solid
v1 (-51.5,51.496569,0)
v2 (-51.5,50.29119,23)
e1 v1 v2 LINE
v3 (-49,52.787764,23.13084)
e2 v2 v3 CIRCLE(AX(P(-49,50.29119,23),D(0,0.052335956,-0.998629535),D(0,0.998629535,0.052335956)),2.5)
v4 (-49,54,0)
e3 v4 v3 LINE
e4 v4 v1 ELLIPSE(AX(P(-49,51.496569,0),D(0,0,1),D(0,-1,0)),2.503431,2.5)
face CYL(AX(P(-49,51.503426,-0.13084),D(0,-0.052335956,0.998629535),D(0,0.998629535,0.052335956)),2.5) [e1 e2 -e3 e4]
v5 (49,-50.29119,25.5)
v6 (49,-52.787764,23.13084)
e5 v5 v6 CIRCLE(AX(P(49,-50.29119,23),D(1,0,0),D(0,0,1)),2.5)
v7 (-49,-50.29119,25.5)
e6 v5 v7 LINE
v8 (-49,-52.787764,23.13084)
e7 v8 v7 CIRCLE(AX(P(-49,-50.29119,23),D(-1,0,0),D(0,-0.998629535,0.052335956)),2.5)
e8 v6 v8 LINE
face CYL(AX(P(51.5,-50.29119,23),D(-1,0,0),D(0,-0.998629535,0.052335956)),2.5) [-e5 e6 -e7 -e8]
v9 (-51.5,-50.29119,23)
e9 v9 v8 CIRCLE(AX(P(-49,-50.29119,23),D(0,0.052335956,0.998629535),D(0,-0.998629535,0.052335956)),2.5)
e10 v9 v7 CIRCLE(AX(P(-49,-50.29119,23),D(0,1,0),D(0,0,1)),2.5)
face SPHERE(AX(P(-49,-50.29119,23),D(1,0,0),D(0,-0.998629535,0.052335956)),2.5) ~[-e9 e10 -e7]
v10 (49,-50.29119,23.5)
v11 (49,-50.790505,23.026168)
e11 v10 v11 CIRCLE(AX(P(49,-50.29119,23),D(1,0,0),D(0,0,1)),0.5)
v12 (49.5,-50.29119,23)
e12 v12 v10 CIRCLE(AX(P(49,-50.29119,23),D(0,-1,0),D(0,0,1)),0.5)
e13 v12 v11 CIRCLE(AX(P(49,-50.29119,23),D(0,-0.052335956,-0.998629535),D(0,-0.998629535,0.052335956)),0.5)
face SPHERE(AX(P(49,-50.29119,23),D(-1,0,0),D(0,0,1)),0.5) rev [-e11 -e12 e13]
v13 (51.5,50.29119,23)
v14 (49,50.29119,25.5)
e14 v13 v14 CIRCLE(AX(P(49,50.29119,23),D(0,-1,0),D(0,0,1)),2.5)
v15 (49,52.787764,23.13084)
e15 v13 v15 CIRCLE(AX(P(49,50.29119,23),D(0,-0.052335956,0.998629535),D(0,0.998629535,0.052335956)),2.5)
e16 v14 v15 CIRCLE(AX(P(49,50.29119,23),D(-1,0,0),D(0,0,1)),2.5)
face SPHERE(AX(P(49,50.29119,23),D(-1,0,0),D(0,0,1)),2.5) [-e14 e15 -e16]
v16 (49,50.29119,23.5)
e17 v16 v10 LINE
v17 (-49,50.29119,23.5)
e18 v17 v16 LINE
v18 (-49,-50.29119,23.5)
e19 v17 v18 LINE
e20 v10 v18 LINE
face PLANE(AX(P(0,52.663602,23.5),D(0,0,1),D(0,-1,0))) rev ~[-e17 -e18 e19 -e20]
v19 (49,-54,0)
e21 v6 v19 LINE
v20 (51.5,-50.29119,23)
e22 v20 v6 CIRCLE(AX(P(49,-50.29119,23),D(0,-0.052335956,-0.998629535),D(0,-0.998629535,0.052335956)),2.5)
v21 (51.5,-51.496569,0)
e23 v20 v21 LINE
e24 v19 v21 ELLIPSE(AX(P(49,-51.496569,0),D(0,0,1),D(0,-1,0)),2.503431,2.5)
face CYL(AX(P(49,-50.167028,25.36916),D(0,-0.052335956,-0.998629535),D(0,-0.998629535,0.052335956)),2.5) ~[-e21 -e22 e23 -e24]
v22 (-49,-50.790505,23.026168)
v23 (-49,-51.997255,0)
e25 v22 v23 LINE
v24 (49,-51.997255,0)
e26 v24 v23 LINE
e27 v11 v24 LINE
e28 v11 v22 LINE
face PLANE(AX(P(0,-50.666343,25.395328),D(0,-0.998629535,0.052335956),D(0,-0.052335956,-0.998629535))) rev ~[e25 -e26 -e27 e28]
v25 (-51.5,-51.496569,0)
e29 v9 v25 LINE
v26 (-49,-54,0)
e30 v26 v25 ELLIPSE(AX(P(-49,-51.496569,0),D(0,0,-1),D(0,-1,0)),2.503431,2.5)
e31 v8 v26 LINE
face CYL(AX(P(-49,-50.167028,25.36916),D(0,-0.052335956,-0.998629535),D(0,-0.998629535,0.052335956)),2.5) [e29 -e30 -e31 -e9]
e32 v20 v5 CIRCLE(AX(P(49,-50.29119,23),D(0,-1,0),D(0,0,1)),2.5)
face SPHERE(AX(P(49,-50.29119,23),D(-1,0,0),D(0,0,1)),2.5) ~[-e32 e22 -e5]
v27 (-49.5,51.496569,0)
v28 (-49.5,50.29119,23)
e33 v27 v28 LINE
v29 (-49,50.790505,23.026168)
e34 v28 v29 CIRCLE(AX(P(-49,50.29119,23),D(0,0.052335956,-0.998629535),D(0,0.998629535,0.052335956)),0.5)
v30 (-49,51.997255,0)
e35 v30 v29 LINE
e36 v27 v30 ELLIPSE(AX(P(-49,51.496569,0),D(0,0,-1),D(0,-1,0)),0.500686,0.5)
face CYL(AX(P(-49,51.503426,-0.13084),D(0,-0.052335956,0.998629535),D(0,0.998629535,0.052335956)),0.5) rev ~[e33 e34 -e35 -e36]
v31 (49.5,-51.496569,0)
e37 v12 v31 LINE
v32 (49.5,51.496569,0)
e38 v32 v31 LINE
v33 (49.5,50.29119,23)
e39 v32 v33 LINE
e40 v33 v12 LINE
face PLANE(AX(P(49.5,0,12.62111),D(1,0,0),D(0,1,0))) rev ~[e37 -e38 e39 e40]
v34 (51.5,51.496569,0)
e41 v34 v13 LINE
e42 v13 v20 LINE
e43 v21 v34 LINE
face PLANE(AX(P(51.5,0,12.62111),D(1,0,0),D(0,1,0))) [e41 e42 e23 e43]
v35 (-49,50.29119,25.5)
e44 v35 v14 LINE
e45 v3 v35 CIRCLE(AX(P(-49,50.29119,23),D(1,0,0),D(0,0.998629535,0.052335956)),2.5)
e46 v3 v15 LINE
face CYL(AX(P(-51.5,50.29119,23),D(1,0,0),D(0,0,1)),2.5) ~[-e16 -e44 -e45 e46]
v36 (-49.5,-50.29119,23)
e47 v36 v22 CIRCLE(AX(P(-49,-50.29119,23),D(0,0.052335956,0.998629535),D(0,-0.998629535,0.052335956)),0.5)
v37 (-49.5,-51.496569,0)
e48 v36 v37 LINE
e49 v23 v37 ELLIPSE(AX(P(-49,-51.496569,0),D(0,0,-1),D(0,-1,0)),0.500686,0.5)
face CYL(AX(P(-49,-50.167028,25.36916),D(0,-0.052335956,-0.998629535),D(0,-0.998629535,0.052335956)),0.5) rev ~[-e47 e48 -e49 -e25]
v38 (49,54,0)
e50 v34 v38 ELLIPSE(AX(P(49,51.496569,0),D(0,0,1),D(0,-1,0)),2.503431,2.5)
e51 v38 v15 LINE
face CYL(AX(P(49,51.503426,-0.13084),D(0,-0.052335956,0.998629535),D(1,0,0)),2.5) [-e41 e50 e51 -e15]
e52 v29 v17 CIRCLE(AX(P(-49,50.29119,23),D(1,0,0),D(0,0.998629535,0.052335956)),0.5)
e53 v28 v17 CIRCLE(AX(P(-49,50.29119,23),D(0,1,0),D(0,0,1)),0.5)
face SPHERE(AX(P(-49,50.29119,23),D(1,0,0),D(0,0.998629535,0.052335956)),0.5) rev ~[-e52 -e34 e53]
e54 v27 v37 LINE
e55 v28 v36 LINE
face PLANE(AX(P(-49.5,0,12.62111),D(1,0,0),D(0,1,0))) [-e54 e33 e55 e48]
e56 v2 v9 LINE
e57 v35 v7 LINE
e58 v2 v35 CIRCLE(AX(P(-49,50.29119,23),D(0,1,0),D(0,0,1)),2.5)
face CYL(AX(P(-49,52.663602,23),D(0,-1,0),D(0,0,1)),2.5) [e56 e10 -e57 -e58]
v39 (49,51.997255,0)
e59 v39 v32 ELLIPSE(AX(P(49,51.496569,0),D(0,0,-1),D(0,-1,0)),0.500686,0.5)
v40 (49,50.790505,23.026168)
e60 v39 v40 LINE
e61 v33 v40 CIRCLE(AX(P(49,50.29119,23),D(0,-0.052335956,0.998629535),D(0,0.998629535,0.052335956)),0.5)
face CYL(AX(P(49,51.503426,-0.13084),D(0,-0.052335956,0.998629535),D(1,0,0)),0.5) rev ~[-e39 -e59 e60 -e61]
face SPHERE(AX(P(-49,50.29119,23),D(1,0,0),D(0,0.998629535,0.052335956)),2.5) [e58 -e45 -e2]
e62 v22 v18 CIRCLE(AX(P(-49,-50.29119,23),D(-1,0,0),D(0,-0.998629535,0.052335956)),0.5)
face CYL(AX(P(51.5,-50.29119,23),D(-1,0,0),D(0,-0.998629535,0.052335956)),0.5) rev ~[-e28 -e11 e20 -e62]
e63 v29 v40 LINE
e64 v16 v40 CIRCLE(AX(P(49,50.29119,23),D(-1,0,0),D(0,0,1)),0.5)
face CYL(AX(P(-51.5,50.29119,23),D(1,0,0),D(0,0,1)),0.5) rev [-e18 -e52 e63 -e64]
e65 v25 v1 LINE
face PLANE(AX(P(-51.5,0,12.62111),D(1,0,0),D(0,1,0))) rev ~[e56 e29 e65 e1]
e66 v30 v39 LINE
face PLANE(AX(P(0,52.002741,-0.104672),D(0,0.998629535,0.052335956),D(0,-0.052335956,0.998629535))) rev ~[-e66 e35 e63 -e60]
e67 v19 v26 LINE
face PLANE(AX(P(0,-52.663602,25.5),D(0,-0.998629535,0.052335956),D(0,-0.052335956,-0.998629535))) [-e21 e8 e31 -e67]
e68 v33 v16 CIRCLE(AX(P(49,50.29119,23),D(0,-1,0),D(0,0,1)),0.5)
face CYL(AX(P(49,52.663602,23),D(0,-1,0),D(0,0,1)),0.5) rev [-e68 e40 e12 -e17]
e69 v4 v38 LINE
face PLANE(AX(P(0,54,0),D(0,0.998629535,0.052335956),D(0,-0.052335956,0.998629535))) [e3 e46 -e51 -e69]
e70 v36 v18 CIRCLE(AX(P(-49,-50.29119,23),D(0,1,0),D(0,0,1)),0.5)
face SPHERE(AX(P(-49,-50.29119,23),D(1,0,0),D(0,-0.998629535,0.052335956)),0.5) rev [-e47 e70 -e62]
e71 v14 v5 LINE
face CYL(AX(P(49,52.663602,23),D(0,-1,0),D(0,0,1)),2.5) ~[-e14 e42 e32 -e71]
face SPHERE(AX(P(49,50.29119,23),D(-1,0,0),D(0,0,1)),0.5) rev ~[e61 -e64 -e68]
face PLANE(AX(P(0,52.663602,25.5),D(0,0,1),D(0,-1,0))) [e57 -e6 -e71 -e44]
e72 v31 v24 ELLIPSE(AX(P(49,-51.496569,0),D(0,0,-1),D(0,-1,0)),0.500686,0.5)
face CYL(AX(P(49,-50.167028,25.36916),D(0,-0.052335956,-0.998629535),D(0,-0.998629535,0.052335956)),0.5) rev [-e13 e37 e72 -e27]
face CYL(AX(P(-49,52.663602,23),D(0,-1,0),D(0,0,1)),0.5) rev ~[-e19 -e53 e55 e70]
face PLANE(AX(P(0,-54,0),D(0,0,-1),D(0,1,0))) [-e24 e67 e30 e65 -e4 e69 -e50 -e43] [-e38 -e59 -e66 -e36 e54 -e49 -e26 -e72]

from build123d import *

# Parameters (mm, degrees)
F3_DEPTH      = 51.5
F3_DEPTH_BACK = 51.5
F4_R          = 2.5
F5_T          = -2


with BuildPart() as f3:
    # F2 (on Right) → F3 (new body, two sides)
    with BuildSketch(Plane.YZ) as f3_sk:
        Polygon((-54, 0), (54, 0), (52.6636016283, 25.5), (-52.6636016283, 25.5), align=None)
    extrude(amount=F3_DEPTH)
    extrude(f3_sk.sketch, amount=-F3_DEPTH_BACK)

    # F4
    f4_edges = [f3.edges().sort_by_distance(p)[0] for p in [
        (0, -52.663602, 25.5),
        (-51.5, -53.331801, 12.75),
        (-51.5, 0, 25.5),
        (51.5, 0, 25.5),
        (51.5, -53.331801, 12.75),
        (51.5, 53.331801, 12.75),
        (0, 52.663602, 25.5),
        (-51.5, 53.331801, 12.75),
    ]]
    fillet(f4_edges, radius=F4_R)

    # F5
    f5_openings = [f3.faces().sort_by_distance(p)[0] for p in [
        (0, 0, 0),
    ]]
    offset(amount=F5_T, openings=f5_openings, kind=Kind.INTERSECTION)


solid = f3.part
